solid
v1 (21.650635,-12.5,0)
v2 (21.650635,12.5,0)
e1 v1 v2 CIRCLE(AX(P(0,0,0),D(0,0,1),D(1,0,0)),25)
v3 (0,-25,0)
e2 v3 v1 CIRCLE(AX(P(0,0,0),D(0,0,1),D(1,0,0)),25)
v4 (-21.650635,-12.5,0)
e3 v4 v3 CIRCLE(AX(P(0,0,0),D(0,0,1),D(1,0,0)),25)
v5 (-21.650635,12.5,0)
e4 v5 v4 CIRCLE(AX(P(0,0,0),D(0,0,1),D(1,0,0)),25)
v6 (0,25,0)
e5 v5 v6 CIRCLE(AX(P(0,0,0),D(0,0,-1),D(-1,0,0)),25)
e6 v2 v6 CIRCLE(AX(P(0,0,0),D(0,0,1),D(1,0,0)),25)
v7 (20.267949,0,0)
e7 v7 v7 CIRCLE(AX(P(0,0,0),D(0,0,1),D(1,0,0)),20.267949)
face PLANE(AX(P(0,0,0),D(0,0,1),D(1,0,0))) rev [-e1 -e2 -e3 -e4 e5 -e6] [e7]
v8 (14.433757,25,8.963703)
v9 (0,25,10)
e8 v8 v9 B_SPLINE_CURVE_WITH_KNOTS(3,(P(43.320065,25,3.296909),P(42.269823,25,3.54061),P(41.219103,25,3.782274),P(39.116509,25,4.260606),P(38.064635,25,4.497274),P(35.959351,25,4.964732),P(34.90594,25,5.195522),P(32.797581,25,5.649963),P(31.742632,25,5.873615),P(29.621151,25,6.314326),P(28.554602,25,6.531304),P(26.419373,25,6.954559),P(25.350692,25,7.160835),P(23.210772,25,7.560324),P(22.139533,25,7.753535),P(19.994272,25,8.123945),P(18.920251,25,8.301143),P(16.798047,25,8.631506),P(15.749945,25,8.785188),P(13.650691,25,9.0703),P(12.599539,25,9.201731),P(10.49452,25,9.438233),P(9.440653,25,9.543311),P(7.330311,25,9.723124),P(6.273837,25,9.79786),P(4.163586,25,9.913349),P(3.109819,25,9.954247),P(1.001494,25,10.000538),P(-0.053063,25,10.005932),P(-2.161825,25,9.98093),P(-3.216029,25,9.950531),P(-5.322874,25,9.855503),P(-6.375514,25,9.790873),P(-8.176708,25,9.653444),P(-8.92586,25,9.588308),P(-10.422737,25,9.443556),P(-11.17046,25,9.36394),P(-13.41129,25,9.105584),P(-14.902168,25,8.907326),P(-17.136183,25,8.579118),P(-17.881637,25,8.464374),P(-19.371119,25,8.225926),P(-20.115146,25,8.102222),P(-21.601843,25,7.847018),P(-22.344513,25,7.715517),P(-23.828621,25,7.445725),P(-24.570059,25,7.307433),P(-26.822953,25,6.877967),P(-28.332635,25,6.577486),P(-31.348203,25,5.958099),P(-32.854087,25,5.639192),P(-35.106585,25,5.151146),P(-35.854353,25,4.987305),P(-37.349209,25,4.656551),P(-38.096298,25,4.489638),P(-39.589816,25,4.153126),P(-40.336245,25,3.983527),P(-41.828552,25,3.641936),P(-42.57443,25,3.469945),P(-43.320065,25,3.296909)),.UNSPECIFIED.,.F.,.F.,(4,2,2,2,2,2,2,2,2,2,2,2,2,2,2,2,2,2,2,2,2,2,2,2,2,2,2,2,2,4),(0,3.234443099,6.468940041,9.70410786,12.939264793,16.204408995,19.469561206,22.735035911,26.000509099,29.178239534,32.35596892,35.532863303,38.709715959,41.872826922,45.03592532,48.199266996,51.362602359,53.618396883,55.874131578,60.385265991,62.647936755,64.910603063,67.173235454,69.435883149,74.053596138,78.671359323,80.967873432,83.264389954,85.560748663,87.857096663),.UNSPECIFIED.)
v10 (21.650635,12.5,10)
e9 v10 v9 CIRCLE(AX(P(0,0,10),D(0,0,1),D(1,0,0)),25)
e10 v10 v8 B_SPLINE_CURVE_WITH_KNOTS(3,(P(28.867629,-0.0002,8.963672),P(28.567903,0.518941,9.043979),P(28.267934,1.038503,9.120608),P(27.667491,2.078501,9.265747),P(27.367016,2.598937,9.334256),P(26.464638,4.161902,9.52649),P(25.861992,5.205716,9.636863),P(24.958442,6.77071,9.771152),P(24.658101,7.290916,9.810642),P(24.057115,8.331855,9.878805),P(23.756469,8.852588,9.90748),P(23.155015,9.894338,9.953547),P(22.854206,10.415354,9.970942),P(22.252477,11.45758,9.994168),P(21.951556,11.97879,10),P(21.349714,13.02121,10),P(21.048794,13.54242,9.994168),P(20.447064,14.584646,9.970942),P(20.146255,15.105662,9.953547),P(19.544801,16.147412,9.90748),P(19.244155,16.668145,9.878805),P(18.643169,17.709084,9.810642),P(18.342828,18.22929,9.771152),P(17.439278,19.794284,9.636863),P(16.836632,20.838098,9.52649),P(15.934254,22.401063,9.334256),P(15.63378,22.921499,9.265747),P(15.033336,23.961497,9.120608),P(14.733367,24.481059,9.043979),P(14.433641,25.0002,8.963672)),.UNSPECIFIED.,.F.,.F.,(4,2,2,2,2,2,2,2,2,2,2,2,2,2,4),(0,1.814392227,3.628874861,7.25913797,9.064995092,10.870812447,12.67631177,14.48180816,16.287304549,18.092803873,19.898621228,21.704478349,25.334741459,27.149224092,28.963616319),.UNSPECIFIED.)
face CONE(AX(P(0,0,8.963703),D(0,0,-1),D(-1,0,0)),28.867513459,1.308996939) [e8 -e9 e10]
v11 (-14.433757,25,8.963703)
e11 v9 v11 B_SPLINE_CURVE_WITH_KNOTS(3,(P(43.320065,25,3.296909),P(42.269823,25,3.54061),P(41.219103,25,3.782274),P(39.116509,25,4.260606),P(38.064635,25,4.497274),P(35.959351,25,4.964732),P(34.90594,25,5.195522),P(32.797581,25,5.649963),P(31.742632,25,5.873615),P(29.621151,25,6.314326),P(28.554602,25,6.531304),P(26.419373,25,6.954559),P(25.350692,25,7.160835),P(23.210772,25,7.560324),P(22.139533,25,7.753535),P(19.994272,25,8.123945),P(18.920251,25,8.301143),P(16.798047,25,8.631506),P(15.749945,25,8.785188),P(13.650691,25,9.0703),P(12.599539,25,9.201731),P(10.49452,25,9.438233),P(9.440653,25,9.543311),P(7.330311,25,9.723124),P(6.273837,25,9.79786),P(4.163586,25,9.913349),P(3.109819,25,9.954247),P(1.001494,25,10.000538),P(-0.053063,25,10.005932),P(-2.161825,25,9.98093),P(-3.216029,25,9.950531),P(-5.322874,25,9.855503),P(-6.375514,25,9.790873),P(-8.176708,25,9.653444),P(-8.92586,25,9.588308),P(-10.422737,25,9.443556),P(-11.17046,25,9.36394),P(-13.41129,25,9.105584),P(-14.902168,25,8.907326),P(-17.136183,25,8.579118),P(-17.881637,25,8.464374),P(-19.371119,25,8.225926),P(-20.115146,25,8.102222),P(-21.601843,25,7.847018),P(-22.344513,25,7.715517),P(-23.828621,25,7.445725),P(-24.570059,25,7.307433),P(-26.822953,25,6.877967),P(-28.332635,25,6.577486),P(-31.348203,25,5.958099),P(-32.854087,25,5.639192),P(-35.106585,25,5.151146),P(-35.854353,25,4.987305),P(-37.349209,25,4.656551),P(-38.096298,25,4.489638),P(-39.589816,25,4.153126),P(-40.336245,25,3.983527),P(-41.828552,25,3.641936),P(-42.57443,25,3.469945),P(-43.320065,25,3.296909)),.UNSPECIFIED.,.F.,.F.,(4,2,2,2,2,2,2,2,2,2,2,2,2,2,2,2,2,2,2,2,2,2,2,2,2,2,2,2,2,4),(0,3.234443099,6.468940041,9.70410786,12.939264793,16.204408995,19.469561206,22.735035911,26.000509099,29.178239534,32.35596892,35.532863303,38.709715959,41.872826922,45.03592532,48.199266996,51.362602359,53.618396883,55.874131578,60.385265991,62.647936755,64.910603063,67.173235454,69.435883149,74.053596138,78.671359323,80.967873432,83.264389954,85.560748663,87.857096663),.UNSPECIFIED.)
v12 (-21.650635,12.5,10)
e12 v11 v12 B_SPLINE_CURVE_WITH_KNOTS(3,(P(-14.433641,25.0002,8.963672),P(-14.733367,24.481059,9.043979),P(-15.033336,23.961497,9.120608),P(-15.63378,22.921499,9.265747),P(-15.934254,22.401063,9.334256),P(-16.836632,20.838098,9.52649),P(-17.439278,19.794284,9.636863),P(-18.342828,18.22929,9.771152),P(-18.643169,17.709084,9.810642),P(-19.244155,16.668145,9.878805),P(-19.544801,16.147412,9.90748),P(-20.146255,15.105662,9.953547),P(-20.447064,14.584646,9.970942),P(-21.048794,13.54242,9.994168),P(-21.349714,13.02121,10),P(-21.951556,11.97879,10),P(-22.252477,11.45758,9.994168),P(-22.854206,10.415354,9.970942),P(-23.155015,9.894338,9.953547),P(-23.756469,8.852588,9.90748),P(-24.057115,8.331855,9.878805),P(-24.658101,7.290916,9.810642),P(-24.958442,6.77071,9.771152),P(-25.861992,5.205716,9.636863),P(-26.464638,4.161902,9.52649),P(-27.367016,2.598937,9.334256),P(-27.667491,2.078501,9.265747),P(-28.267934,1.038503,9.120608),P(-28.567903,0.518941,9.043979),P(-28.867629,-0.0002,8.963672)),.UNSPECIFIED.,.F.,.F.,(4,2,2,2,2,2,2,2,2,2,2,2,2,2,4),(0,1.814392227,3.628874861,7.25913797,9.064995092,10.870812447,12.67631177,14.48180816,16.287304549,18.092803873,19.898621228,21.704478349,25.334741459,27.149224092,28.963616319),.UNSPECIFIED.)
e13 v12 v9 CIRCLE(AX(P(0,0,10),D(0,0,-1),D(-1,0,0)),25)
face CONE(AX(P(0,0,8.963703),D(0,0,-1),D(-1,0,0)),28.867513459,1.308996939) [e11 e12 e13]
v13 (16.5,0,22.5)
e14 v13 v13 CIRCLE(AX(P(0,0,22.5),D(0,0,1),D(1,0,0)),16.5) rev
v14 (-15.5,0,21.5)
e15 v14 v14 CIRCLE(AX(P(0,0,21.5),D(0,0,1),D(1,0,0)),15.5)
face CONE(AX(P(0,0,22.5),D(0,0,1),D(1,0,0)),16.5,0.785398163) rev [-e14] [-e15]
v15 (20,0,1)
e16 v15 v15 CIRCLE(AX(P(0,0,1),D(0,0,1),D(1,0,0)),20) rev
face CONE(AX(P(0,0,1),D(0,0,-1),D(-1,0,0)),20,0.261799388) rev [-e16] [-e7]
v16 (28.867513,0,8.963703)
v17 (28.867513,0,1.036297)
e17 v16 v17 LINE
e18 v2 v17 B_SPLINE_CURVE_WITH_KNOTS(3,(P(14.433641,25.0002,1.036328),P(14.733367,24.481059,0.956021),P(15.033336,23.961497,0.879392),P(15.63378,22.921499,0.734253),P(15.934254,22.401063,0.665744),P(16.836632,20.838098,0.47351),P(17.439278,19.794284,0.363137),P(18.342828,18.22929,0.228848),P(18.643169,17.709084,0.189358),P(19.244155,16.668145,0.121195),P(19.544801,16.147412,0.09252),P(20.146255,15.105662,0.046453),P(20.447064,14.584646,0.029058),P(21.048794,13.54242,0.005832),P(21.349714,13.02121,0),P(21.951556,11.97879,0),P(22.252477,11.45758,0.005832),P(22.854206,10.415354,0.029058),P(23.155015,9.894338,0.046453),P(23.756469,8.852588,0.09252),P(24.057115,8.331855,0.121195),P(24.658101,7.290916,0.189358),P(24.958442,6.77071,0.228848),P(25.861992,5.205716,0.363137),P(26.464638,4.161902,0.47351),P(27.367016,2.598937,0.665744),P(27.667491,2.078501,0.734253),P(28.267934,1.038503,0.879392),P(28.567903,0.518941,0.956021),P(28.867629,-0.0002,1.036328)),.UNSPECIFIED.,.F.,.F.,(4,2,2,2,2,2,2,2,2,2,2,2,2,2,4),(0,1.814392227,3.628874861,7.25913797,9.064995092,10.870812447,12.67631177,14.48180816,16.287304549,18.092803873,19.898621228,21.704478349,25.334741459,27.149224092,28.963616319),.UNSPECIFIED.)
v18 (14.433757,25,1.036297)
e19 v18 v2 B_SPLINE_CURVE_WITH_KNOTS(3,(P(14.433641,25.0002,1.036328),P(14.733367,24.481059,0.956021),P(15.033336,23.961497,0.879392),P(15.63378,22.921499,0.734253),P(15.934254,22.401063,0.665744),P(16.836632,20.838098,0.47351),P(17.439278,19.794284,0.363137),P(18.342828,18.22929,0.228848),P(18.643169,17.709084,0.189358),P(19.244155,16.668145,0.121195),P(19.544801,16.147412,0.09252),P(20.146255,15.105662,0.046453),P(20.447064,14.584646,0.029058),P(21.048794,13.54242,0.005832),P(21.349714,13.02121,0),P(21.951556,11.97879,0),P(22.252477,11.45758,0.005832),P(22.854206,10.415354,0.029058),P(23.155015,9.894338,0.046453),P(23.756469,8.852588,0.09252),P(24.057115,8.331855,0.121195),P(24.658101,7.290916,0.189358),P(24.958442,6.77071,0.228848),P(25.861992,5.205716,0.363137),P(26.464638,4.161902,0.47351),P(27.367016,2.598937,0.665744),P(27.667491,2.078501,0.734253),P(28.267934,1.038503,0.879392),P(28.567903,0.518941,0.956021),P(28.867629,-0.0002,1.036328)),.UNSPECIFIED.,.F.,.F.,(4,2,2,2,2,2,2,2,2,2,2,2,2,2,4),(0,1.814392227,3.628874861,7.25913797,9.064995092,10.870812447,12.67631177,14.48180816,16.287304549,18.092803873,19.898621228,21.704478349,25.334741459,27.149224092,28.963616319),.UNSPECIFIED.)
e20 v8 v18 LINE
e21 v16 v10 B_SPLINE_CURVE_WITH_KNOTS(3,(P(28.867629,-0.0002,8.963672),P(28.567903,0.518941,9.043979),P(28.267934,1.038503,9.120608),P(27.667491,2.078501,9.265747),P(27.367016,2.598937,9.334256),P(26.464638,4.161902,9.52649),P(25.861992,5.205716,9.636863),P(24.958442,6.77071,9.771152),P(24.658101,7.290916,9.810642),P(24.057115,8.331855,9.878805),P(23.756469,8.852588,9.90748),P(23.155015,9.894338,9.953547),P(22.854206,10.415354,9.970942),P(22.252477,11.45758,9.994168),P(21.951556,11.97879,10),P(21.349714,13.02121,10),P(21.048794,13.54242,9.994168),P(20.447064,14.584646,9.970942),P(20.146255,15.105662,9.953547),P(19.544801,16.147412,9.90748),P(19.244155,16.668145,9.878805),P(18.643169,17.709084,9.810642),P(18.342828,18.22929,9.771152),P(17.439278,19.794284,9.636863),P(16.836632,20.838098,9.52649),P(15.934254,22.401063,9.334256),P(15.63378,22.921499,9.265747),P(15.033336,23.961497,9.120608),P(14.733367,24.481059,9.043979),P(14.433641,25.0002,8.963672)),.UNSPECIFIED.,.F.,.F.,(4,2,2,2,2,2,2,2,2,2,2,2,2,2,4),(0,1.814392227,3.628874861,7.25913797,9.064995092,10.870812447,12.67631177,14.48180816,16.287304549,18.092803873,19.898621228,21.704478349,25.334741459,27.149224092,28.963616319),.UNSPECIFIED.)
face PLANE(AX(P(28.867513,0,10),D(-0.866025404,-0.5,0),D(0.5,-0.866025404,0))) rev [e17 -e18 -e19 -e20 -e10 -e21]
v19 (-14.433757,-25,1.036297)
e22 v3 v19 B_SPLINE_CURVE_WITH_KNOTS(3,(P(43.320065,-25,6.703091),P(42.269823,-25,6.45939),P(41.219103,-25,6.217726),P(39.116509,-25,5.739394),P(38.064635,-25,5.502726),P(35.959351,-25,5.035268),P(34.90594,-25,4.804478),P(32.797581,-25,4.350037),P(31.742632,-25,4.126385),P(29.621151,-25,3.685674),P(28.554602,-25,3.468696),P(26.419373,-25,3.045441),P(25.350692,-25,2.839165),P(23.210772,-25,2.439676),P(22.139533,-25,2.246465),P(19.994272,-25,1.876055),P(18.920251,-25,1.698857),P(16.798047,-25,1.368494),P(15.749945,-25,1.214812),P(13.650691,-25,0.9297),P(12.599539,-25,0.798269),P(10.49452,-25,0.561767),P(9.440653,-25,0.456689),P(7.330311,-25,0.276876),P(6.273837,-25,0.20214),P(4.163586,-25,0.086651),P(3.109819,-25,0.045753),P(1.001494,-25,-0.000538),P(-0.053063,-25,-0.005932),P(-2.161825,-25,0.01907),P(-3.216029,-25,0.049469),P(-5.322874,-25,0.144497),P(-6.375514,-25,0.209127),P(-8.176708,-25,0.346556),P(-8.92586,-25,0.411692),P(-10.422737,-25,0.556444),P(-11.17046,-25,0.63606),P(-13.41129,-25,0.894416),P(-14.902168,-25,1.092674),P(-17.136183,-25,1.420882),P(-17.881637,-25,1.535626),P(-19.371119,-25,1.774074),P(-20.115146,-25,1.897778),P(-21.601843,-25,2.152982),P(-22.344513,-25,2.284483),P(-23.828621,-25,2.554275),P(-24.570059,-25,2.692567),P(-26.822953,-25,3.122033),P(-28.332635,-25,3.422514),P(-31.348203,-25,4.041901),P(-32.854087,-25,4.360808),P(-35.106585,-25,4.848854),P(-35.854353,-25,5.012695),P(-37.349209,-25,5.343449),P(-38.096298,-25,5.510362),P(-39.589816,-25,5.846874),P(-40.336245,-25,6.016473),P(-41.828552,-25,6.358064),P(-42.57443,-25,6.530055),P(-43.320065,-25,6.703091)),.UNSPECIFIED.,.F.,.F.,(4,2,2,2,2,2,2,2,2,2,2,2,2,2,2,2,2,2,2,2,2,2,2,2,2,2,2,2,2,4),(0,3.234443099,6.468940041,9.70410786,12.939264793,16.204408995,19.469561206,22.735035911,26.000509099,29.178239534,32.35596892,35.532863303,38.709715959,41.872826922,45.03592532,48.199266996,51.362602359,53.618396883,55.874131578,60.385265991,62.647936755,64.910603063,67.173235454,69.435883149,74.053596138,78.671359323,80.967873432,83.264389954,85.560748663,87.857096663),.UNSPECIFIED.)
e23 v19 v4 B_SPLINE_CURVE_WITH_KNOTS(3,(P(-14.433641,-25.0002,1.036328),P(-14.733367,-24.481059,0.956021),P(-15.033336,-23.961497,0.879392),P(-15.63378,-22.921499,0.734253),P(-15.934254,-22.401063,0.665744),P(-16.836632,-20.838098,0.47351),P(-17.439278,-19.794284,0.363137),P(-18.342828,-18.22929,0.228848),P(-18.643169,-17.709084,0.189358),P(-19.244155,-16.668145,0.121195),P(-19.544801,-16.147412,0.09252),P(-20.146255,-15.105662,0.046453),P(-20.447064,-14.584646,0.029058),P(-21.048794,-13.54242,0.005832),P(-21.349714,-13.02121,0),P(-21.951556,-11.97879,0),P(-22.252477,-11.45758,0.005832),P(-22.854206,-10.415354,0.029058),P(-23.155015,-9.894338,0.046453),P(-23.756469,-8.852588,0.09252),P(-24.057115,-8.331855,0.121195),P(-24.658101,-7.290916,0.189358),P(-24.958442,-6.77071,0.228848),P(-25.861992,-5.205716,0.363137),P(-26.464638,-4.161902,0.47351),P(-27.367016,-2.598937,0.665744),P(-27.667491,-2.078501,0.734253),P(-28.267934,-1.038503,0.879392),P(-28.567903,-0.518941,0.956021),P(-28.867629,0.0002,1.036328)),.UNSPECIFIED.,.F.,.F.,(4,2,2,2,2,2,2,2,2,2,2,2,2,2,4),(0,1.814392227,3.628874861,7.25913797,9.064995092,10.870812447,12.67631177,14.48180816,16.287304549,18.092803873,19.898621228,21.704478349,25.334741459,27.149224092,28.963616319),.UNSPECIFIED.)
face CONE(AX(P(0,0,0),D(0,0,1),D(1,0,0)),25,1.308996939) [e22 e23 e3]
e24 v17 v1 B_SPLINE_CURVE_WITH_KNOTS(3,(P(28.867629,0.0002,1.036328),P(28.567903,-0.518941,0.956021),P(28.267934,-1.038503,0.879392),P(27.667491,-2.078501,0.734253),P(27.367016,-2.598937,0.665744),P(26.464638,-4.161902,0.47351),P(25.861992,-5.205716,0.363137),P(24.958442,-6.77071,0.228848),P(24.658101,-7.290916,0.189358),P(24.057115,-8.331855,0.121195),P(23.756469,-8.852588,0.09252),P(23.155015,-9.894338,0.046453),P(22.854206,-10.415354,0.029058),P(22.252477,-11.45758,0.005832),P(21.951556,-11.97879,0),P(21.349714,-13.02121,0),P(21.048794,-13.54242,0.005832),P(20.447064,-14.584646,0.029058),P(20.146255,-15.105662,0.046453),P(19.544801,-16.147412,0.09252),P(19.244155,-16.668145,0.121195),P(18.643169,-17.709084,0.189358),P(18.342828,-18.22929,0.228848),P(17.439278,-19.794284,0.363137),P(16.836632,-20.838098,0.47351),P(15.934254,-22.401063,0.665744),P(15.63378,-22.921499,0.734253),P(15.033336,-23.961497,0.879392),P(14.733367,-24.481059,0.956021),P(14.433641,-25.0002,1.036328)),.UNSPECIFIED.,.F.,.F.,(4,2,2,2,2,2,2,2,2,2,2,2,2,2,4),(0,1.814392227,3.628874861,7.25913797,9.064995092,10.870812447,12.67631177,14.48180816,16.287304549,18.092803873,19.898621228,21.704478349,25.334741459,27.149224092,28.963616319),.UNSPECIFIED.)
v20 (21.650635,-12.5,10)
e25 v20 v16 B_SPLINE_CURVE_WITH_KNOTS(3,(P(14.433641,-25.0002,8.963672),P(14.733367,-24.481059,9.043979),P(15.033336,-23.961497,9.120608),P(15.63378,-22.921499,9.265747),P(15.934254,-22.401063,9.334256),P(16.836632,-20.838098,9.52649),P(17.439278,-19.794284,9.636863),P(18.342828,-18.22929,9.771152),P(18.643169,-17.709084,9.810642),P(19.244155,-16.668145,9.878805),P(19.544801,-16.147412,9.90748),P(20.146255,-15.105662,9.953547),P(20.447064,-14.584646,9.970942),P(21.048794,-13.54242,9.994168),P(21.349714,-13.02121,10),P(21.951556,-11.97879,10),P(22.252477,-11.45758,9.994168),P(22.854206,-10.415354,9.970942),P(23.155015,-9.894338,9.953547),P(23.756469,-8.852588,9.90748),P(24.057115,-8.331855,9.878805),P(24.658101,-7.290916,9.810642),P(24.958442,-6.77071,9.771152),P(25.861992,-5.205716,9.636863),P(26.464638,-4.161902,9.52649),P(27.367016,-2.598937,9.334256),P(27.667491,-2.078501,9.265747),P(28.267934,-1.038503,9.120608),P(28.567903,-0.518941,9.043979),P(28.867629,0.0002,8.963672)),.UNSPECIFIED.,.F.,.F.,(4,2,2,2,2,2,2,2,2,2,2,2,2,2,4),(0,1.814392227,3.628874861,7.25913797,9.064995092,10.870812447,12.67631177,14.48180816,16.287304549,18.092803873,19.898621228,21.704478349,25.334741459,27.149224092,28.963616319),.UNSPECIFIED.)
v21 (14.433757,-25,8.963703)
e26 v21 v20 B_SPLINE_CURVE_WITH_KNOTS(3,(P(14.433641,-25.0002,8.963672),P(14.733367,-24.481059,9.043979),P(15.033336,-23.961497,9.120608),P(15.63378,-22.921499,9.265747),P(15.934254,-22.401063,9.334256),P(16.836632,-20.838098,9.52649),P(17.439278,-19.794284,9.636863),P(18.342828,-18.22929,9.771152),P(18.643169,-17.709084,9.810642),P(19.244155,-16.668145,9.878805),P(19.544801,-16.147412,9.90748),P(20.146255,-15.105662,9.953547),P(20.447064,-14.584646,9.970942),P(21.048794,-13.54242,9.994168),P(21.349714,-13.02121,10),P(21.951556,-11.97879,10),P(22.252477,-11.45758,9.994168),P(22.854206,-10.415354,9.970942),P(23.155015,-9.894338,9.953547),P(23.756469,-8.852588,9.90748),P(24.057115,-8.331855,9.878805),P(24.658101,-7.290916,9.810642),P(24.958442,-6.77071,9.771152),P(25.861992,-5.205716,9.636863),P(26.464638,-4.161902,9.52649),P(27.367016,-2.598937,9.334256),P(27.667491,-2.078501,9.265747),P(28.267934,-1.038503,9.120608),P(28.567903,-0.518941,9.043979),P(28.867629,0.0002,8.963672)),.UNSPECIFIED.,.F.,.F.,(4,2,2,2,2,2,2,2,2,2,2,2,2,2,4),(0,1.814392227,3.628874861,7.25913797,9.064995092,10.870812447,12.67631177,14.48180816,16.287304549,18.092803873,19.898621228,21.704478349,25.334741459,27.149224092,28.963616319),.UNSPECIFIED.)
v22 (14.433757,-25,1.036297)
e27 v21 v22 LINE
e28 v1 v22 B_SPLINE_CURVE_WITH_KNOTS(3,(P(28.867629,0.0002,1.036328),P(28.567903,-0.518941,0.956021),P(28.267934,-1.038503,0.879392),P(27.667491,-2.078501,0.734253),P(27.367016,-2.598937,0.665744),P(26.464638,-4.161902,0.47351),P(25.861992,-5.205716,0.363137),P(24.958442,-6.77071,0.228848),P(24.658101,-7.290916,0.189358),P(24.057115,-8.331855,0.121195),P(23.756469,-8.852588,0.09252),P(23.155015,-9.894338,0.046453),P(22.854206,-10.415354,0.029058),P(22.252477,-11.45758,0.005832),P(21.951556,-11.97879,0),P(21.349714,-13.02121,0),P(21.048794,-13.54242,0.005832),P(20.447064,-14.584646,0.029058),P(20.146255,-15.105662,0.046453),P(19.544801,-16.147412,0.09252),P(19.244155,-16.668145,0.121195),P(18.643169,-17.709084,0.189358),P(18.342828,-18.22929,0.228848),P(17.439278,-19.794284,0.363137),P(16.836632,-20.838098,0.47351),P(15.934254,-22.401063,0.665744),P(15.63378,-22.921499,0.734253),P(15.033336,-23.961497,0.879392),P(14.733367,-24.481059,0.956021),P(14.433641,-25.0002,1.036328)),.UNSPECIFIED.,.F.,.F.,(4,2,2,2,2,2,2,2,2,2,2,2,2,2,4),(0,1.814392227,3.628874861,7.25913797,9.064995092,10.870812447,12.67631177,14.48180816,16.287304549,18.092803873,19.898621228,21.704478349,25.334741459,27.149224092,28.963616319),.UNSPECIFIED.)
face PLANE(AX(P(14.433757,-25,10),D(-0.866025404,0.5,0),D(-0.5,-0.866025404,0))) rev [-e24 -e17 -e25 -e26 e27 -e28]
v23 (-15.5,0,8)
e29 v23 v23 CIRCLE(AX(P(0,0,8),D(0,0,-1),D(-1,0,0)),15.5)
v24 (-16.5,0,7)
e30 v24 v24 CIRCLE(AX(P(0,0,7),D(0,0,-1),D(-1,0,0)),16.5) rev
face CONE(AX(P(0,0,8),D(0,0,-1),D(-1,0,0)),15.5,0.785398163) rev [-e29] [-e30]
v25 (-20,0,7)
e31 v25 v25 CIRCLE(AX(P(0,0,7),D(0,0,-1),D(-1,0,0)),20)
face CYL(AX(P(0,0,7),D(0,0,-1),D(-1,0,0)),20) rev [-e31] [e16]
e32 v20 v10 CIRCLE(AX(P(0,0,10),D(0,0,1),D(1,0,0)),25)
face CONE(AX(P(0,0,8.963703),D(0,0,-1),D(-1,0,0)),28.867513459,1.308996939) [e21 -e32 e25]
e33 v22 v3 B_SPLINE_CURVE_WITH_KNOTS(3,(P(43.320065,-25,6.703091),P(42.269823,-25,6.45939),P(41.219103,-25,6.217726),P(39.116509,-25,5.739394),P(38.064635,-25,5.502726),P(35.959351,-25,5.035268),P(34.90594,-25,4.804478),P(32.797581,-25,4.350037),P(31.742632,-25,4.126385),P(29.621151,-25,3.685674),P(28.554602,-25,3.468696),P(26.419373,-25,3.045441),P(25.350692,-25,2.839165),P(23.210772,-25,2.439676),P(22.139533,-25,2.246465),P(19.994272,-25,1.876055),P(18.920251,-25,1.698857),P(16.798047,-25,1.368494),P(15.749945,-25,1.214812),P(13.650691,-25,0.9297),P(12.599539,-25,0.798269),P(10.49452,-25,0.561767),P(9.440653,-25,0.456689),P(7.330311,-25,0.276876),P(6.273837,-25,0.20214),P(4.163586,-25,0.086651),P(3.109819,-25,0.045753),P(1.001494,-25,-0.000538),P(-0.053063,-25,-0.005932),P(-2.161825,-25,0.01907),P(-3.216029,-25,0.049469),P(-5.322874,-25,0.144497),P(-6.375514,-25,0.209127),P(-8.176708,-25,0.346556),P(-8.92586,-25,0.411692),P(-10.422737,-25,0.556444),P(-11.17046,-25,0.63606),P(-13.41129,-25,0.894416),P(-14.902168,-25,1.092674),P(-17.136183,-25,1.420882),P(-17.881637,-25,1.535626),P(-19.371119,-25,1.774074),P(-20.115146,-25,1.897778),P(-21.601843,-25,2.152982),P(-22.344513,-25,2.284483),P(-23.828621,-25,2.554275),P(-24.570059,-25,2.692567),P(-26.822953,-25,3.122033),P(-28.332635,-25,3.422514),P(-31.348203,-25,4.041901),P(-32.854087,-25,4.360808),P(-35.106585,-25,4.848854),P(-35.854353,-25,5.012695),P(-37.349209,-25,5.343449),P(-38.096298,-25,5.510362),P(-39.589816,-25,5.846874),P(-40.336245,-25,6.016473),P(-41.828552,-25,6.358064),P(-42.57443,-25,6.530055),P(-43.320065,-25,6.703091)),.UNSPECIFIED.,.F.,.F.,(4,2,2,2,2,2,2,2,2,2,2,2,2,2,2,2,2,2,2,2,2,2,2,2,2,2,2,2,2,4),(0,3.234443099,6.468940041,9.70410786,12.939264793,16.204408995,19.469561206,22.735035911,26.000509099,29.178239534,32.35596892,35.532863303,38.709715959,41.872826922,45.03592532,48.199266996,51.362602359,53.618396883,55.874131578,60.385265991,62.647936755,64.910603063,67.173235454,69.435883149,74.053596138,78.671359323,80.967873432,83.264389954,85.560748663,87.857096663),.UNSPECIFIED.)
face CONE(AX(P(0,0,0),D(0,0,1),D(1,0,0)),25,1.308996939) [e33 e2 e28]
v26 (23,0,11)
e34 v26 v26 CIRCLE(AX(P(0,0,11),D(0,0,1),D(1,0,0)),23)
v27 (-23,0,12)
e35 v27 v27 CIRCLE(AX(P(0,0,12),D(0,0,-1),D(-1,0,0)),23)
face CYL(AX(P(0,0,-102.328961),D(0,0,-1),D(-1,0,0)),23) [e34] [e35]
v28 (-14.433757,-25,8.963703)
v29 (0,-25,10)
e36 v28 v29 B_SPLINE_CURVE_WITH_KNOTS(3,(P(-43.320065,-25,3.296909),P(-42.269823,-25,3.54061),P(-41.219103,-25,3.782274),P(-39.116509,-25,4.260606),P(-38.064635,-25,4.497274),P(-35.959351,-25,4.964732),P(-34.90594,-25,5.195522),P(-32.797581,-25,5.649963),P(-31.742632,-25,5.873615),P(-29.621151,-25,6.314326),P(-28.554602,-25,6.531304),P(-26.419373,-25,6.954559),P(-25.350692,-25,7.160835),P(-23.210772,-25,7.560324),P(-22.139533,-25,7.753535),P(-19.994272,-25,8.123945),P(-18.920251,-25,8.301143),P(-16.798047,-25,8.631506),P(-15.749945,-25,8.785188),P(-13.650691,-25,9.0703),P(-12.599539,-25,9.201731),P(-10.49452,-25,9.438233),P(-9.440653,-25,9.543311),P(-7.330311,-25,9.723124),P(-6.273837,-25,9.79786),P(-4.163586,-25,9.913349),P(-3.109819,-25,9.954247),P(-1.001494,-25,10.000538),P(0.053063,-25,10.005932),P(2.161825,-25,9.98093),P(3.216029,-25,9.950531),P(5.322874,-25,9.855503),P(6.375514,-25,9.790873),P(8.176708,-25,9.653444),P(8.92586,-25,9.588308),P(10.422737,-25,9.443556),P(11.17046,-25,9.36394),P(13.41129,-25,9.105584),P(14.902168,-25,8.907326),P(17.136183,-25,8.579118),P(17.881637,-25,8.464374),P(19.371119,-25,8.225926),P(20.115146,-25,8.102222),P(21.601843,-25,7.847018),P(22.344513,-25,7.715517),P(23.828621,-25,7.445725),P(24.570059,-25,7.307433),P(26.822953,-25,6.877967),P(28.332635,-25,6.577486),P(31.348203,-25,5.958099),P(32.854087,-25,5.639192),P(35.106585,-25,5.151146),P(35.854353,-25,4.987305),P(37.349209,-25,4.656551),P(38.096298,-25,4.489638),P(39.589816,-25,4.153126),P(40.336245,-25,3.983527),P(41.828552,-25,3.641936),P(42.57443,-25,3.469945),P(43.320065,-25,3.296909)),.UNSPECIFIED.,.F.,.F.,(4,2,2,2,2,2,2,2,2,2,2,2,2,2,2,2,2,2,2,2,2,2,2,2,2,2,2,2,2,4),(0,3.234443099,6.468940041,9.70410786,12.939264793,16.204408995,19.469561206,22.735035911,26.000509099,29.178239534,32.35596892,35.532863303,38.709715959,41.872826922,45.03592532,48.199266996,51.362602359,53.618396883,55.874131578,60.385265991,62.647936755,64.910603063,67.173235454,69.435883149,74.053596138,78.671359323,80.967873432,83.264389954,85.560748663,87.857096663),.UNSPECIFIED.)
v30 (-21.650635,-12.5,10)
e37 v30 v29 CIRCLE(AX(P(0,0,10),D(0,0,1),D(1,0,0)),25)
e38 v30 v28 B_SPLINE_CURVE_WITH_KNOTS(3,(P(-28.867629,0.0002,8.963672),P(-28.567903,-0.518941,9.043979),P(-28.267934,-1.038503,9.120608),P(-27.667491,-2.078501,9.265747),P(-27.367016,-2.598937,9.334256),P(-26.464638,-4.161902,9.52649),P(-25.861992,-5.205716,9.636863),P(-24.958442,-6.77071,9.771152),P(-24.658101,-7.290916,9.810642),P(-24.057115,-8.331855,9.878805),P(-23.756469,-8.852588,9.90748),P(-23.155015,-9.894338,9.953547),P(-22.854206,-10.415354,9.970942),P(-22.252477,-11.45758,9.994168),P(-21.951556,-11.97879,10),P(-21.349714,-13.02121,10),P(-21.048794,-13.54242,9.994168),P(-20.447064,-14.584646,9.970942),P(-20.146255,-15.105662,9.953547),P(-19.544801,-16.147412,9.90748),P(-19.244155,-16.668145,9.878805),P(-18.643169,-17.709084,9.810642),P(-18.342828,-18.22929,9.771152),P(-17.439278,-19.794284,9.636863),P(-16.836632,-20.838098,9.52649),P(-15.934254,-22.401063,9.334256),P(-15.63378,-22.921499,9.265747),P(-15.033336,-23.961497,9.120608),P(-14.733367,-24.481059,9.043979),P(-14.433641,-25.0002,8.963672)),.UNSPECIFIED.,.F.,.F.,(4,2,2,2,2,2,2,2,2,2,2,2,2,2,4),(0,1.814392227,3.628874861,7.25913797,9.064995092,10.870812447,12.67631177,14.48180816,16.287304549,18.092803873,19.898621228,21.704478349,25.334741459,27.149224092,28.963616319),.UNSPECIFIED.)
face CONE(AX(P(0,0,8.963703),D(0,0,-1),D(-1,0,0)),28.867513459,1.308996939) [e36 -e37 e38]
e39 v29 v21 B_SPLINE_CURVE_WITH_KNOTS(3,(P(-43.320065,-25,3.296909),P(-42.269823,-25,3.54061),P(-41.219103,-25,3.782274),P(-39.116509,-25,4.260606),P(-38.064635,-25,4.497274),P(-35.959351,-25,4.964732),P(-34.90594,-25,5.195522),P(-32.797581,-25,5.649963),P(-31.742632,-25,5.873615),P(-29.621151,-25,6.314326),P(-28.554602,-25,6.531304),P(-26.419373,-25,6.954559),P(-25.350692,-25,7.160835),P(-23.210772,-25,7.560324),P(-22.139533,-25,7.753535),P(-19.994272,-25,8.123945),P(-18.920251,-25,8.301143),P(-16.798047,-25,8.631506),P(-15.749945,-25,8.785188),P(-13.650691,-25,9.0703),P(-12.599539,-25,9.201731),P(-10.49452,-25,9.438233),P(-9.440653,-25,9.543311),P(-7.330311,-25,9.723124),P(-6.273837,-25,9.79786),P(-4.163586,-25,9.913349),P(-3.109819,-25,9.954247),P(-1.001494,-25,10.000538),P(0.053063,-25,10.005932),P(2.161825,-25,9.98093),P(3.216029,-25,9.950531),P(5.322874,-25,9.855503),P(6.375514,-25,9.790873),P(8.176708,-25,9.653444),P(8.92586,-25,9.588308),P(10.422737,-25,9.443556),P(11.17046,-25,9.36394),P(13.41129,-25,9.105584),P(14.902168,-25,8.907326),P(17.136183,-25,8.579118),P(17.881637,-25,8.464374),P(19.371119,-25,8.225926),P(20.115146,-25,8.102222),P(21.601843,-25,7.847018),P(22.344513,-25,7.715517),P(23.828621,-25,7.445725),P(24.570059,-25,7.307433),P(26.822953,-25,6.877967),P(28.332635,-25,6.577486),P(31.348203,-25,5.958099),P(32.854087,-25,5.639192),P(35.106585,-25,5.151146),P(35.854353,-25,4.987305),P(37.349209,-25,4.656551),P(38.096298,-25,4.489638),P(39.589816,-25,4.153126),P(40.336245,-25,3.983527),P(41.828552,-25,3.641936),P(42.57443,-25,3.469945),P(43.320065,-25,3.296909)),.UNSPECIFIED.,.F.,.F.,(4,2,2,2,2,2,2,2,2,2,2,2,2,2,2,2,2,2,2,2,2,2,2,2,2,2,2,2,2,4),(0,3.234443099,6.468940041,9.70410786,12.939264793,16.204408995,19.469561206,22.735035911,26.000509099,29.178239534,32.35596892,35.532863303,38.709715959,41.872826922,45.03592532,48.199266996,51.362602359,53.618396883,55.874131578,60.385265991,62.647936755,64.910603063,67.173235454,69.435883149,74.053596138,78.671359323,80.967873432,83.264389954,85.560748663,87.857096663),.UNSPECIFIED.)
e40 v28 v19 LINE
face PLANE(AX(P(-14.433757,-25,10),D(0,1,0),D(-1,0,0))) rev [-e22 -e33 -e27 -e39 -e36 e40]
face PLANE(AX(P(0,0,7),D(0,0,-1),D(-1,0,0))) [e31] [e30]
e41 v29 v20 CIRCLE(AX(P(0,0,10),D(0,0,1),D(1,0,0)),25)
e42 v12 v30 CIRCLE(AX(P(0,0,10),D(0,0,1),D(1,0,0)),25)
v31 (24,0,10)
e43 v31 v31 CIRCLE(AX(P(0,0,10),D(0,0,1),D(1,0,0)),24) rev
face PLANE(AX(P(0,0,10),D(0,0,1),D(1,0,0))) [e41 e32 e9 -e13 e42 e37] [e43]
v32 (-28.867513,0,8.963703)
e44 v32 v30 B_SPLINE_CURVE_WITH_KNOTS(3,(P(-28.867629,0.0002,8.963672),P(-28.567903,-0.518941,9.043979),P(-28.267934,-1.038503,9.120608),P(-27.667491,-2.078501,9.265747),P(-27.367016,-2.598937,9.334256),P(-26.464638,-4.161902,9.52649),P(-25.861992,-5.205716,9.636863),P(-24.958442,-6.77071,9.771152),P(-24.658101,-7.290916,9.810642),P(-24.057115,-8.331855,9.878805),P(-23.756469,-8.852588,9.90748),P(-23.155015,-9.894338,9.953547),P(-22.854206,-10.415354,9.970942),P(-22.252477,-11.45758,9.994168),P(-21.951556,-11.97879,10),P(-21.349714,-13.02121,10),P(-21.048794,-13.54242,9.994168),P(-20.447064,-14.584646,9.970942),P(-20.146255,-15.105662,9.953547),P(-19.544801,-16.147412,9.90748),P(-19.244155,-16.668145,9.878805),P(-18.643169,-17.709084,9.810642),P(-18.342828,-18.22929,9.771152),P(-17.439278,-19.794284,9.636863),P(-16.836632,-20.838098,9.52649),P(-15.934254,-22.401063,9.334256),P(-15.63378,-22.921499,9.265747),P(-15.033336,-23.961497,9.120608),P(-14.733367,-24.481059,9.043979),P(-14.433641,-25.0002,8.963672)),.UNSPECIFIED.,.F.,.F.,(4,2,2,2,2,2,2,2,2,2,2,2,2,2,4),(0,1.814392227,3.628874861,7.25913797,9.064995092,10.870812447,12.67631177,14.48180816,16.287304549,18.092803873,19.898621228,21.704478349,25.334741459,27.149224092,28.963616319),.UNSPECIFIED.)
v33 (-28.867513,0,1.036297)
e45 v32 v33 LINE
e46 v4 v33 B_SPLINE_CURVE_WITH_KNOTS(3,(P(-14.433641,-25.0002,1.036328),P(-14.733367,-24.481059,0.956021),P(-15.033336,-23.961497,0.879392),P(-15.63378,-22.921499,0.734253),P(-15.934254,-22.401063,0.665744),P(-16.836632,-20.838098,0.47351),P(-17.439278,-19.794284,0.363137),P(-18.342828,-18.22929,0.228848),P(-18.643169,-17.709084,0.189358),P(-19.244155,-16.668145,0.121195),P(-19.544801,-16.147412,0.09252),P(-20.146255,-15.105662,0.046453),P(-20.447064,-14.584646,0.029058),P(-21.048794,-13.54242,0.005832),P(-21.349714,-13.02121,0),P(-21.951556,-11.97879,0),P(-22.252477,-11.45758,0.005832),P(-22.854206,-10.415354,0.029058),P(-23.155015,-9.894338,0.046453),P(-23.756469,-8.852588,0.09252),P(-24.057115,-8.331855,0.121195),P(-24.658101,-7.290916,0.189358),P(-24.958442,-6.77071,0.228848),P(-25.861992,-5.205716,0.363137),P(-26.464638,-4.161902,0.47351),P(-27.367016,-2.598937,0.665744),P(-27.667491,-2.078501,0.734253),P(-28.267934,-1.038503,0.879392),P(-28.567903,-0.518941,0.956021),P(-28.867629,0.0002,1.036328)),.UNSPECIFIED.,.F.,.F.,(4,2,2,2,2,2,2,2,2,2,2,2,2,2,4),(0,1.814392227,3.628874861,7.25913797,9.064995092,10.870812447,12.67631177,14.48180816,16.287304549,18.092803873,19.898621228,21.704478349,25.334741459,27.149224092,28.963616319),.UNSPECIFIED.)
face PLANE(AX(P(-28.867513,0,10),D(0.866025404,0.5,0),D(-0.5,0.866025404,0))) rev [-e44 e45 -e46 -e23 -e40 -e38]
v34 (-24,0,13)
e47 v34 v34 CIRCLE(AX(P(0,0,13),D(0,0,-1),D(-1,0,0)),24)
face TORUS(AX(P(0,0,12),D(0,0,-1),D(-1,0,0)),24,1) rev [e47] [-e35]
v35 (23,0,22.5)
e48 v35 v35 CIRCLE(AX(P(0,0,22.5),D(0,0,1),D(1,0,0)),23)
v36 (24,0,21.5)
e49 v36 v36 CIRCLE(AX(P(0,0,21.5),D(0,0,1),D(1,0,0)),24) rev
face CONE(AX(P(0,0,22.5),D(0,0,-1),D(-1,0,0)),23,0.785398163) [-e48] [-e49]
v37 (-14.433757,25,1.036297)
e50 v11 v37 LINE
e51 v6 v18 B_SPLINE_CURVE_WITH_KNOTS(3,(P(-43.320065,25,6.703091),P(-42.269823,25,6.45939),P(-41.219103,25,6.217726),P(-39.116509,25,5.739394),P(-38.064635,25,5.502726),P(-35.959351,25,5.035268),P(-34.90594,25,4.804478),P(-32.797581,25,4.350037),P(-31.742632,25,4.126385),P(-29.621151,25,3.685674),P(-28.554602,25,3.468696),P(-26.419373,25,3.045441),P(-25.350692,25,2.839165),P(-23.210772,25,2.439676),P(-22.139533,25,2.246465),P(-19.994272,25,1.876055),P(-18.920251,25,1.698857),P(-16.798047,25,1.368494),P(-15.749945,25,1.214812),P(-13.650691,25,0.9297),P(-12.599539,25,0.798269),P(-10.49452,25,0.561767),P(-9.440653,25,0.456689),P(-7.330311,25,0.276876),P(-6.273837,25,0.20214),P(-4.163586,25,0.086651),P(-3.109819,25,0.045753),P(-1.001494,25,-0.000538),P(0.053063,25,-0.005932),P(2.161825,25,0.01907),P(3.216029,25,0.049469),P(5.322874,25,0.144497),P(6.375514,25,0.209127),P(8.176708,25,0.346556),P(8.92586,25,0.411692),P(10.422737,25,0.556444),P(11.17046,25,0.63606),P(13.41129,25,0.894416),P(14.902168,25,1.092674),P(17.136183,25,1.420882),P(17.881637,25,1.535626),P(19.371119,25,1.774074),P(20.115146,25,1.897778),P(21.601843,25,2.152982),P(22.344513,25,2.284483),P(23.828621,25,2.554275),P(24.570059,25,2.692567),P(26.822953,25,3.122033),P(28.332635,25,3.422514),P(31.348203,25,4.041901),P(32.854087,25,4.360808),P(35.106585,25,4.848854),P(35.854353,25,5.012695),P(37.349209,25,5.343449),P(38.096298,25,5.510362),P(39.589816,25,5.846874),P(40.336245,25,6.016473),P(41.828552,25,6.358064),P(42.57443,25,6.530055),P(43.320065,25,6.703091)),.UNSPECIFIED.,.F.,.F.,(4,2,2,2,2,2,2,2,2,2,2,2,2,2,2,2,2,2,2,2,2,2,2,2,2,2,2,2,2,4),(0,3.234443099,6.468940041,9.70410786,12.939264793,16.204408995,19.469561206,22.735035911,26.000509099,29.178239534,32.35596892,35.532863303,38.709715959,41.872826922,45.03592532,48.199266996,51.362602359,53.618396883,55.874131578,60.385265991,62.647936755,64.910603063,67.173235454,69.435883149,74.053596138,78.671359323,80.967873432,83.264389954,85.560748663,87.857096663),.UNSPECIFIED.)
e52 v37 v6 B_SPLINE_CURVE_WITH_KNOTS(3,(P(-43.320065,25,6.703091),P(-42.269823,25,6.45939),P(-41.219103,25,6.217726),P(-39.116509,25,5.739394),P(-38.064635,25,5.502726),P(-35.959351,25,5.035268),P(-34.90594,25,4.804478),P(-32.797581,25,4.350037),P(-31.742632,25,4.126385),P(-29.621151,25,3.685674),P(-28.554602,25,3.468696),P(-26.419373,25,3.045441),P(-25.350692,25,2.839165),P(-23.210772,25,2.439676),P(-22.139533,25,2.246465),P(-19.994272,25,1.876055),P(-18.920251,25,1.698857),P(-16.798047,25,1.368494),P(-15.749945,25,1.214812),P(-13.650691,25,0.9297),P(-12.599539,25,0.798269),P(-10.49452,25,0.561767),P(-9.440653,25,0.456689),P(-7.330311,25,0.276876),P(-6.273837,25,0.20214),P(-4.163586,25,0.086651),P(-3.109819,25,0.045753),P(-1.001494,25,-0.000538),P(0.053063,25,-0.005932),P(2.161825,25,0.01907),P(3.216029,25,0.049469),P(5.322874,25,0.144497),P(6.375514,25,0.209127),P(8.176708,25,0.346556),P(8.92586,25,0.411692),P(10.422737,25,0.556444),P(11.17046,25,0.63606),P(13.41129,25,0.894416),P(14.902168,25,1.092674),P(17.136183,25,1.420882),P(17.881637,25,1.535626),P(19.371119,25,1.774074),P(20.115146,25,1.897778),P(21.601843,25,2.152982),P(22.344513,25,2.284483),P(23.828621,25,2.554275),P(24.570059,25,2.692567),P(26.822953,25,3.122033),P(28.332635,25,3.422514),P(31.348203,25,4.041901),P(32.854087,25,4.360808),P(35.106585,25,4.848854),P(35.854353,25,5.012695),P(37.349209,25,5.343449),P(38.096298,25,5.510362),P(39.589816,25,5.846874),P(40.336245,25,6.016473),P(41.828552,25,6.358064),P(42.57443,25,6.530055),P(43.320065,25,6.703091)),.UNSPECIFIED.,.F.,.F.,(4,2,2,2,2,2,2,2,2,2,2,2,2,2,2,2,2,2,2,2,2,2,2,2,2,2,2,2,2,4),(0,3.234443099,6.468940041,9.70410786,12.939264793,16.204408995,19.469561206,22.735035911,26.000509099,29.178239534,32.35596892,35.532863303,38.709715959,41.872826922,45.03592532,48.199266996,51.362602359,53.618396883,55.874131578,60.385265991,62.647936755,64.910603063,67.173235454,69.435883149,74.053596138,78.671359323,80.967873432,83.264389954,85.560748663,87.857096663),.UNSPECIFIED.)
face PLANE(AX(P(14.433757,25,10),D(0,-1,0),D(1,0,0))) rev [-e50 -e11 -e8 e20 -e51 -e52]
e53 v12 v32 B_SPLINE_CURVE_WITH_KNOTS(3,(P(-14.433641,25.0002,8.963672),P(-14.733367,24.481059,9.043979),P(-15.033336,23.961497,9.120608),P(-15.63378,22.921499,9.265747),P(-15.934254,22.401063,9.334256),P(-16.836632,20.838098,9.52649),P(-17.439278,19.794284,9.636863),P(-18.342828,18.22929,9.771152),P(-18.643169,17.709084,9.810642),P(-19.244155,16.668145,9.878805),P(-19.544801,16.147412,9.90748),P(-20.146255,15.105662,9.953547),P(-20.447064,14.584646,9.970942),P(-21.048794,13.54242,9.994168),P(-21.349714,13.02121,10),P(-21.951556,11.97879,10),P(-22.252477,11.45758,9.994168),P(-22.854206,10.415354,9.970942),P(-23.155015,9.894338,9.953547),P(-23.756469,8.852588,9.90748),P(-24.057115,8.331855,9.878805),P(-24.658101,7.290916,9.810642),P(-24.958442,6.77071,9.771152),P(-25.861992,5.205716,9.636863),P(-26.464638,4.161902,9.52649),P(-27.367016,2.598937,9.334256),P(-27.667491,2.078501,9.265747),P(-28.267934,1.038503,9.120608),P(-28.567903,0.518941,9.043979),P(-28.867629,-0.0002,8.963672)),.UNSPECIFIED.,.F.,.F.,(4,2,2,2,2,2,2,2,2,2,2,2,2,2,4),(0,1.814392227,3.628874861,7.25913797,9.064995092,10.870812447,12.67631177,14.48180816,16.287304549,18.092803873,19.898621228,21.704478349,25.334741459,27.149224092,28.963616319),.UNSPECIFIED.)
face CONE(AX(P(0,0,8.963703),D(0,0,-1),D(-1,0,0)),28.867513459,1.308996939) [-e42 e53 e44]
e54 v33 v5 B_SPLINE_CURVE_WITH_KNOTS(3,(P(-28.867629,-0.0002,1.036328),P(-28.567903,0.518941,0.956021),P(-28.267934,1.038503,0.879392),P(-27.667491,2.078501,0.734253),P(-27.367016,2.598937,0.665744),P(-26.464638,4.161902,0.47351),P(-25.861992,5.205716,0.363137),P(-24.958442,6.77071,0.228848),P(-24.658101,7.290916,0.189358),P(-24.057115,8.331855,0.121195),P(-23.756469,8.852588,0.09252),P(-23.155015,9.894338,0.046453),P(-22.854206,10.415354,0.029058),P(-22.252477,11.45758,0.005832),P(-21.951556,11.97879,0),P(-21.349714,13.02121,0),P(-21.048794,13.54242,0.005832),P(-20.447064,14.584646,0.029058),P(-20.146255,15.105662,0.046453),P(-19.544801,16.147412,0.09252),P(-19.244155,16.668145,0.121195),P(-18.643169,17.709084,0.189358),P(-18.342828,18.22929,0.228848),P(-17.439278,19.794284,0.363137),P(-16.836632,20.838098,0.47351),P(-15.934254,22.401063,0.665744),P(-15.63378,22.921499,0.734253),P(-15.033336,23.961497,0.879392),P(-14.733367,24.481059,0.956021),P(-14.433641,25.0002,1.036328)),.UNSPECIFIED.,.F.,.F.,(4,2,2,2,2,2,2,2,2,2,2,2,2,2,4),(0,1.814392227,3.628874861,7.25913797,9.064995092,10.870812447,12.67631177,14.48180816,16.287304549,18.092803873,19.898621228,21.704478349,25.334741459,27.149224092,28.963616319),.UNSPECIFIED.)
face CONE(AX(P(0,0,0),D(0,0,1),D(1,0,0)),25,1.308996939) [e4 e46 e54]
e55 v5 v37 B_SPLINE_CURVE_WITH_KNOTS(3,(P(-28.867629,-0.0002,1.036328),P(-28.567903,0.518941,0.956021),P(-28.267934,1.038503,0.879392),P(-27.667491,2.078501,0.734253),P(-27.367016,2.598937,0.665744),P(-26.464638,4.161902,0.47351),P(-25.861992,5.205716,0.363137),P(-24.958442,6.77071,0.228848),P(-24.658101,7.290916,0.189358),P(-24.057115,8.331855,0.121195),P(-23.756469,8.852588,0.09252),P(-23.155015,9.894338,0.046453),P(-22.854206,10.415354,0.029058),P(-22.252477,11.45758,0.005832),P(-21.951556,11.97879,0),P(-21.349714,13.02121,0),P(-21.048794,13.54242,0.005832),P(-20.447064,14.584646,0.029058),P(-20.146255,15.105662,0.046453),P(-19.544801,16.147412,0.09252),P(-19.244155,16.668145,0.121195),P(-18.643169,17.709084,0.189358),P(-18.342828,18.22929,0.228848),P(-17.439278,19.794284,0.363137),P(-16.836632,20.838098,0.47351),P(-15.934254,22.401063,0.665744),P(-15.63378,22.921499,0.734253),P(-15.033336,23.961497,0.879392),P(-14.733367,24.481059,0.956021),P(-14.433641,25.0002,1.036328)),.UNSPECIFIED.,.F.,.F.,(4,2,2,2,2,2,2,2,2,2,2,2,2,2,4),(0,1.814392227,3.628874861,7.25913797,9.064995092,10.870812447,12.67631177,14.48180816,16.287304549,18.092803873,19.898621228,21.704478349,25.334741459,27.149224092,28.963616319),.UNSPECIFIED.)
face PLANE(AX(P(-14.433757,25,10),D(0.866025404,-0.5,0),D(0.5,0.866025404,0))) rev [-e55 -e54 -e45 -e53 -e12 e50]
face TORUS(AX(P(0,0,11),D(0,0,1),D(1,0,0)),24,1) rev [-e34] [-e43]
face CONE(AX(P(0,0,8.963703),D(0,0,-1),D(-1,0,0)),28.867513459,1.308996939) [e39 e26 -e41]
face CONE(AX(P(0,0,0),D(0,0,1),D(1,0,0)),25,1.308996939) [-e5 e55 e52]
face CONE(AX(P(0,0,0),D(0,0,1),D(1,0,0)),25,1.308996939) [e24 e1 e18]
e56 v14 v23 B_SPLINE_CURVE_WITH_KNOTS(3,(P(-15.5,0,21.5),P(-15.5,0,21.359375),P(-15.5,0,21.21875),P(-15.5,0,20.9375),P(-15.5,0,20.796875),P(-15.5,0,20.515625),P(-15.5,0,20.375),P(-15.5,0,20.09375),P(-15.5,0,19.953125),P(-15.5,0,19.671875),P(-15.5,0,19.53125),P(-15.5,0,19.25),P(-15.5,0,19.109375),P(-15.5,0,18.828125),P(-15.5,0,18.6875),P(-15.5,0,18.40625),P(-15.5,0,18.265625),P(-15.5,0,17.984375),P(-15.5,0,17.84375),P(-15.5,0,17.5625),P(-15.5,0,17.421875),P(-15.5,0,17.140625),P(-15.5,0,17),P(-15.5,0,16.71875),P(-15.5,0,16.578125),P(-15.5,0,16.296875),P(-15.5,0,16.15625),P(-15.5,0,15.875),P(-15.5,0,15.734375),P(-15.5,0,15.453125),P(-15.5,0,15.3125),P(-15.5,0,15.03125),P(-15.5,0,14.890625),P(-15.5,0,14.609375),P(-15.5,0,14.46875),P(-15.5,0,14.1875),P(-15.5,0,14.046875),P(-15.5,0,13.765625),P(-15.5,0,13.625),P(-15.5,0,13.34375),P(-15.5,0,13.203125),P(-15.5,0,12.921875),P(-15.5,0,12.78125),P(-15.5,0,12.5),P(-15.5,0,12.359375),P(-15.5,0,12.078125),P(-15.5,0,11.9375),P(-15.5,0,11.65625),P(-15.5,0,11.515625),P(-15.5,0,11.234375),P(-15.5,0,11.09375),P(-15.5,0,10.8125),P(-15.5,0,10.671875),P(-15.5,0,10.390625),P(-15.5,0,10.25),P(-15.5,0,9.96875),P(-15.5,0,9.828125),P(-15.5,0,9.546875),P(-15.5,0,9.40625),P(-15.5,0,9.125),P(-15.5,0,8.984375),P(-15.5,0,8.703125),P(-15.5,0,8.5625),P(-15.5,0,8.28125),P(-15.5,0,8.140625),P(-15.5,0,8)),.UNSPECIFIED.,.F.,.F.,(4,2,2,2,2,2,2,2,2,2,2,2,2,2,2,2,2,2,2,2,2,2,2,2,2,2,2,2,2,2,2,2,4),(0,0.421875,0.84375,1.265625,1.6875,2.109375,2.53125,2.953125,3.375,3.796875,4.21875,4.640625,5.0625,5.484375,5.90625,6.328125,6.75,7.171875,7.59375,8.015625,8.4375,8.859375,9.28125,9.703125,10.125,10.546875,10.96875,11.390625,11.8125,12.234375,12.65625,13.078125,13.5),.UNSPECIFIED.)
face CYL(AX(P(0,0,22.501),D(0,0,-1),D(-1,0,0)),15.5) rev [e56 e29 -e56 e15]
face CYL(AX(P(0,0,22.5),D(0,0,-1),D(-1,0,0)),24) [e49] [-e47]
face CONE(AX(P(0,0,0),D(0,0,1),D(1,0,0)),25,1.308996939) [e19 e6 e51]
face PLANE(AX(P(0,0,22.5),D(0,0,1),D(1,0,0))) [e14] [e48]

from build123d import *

# Parameters (mm, degrees)
BOSS_EXTRUDE1_DEPTH = 10
SKETCH2_R           = 24
BOSS_EXTRUDE2_DEPTH = 12.5
SKETCH3_R           = 20
CUT_EXTRUDE1_DEPTH  = 7
CUT_EXTRUDE2_REACH  = 43.214
SKETCH4_R           = 15.5
CHAMFER1_SIZE       = 1
CHAMFER2_SIZE       = 1
CHAMFER2_SIZE2      = 0.267949192
SKETCH5_W           = 1
SKETCH5_H           = 3
FILLET1_R           = 1


with BuildPart() as part:
    # Sketch1 → Boss-Extrude1 (new body)
    with BuildSketch(Plane.XY):
        Polygon((28.867513459, 0), (14.43375673, 25), (-14.43375673, 25), (-28.867513459, 0), (-14.43375673, -25), (14.43375673, -25), align=None)
    extrude(amount=BOSS_EXTRUDE1_DEPTH)

    # Sketch2 → Boss-Extrude2 (add)
    with BuildSketch(Plane.XY.offset(10)):
        Circle(SKETCH2_R)
    extrude(amount=BOSS_EXTRUDE2_DEPTH)

    # Sketch3 → Cut-Extrude1 (cut)
    with BuildSketch(Plane(origin=(0, 0, 0), x_dir=(-1, 0, 0), z_dir=(0, 0, -1))):
        Circle(SKETCH3_R)
    extrude(amount=-CUT_EXTRUDE1_DEPTH, mode=Mode.SUBTRACT)

    # Sketch4 → Cut-Extrude2 (cut, up to next)
    with BuildSketch(Plane(origin=(0, 0, 7), x_dir=(-1, 0, 0), z_dir=(0, 0, -1)), mode=Mode.PRIVATE) as cut_extrude2_sk1:
        Circle(SKETCH4_R)
    cut_extrude2_tool1 = extrude(cut_extrude2_sk1.sketch, amount=-CUT_EXTRUDE2_REACH, mode=Mode.PRIVATE) & part.part
    add(cut_extrude2_tool1.solids().sort_by_distance((0, 0, 7))[0], mode=Mode.SUBTRACT)

    # Chamfer1
    chamfer1_edges = [part.edges().sort_by_distance(p)[0] for p in [
        (-24, 0, 22.5),
        (15.5, 0, 22.5),
        (15.5, 0, 7),
    ]]
    chamfer(chamfer1_edges, length=CHAMFER1_SIZE)

    # Chamfer2
    chamfer2_edges = [part.edges().sort_by_distance(p)[0] for p in [
        (20, 0, 0),
    ]]
    chamfer2_side = [part.faces().sort_by_distance(p)[0] for p in [
        (20, 0, 3.5),
    ]]
    chamfer(chamfer2_edges, length=CHAMFER2_SIZE, length2=CHAMFER2_SIZE2, reference=chamfer2_side[0])

    # Sketch5 → Cut-Revolve1 (revolve, cut)
    with BuildSketch(Plane(origin=(0, 0, 0), x_dir=(1, 0, 0), z_dir=(0, 1, 0))):
        Polygon((25, -10), (28.867513459, -8.963702892), (28.867513459, -10), align=None)
        with Locations((23.5, -11.5)):
            Rectangle(SKETCH5_W, SKETCH5_H)
        Polygon((28.867513459, 0), (28.867513459, -1.036297108), (25, 0), align=None)
    revolve(axis=Axis((0, 0, -102.328960849), (0, 0, 1)), mode=Mode.SUBTRACT)

    # Fillet1
    fillet1_edges = [part.edges().sort_by_distance(p)[0] for p in [
        (-23, 0, 13),
        (-23, 0, 10),
    ]]
    fillet(fillet1_edges, radius=FILLET1_R - 0.0001)  # a hair under: the kernel refuses the full size


solid = part.part
